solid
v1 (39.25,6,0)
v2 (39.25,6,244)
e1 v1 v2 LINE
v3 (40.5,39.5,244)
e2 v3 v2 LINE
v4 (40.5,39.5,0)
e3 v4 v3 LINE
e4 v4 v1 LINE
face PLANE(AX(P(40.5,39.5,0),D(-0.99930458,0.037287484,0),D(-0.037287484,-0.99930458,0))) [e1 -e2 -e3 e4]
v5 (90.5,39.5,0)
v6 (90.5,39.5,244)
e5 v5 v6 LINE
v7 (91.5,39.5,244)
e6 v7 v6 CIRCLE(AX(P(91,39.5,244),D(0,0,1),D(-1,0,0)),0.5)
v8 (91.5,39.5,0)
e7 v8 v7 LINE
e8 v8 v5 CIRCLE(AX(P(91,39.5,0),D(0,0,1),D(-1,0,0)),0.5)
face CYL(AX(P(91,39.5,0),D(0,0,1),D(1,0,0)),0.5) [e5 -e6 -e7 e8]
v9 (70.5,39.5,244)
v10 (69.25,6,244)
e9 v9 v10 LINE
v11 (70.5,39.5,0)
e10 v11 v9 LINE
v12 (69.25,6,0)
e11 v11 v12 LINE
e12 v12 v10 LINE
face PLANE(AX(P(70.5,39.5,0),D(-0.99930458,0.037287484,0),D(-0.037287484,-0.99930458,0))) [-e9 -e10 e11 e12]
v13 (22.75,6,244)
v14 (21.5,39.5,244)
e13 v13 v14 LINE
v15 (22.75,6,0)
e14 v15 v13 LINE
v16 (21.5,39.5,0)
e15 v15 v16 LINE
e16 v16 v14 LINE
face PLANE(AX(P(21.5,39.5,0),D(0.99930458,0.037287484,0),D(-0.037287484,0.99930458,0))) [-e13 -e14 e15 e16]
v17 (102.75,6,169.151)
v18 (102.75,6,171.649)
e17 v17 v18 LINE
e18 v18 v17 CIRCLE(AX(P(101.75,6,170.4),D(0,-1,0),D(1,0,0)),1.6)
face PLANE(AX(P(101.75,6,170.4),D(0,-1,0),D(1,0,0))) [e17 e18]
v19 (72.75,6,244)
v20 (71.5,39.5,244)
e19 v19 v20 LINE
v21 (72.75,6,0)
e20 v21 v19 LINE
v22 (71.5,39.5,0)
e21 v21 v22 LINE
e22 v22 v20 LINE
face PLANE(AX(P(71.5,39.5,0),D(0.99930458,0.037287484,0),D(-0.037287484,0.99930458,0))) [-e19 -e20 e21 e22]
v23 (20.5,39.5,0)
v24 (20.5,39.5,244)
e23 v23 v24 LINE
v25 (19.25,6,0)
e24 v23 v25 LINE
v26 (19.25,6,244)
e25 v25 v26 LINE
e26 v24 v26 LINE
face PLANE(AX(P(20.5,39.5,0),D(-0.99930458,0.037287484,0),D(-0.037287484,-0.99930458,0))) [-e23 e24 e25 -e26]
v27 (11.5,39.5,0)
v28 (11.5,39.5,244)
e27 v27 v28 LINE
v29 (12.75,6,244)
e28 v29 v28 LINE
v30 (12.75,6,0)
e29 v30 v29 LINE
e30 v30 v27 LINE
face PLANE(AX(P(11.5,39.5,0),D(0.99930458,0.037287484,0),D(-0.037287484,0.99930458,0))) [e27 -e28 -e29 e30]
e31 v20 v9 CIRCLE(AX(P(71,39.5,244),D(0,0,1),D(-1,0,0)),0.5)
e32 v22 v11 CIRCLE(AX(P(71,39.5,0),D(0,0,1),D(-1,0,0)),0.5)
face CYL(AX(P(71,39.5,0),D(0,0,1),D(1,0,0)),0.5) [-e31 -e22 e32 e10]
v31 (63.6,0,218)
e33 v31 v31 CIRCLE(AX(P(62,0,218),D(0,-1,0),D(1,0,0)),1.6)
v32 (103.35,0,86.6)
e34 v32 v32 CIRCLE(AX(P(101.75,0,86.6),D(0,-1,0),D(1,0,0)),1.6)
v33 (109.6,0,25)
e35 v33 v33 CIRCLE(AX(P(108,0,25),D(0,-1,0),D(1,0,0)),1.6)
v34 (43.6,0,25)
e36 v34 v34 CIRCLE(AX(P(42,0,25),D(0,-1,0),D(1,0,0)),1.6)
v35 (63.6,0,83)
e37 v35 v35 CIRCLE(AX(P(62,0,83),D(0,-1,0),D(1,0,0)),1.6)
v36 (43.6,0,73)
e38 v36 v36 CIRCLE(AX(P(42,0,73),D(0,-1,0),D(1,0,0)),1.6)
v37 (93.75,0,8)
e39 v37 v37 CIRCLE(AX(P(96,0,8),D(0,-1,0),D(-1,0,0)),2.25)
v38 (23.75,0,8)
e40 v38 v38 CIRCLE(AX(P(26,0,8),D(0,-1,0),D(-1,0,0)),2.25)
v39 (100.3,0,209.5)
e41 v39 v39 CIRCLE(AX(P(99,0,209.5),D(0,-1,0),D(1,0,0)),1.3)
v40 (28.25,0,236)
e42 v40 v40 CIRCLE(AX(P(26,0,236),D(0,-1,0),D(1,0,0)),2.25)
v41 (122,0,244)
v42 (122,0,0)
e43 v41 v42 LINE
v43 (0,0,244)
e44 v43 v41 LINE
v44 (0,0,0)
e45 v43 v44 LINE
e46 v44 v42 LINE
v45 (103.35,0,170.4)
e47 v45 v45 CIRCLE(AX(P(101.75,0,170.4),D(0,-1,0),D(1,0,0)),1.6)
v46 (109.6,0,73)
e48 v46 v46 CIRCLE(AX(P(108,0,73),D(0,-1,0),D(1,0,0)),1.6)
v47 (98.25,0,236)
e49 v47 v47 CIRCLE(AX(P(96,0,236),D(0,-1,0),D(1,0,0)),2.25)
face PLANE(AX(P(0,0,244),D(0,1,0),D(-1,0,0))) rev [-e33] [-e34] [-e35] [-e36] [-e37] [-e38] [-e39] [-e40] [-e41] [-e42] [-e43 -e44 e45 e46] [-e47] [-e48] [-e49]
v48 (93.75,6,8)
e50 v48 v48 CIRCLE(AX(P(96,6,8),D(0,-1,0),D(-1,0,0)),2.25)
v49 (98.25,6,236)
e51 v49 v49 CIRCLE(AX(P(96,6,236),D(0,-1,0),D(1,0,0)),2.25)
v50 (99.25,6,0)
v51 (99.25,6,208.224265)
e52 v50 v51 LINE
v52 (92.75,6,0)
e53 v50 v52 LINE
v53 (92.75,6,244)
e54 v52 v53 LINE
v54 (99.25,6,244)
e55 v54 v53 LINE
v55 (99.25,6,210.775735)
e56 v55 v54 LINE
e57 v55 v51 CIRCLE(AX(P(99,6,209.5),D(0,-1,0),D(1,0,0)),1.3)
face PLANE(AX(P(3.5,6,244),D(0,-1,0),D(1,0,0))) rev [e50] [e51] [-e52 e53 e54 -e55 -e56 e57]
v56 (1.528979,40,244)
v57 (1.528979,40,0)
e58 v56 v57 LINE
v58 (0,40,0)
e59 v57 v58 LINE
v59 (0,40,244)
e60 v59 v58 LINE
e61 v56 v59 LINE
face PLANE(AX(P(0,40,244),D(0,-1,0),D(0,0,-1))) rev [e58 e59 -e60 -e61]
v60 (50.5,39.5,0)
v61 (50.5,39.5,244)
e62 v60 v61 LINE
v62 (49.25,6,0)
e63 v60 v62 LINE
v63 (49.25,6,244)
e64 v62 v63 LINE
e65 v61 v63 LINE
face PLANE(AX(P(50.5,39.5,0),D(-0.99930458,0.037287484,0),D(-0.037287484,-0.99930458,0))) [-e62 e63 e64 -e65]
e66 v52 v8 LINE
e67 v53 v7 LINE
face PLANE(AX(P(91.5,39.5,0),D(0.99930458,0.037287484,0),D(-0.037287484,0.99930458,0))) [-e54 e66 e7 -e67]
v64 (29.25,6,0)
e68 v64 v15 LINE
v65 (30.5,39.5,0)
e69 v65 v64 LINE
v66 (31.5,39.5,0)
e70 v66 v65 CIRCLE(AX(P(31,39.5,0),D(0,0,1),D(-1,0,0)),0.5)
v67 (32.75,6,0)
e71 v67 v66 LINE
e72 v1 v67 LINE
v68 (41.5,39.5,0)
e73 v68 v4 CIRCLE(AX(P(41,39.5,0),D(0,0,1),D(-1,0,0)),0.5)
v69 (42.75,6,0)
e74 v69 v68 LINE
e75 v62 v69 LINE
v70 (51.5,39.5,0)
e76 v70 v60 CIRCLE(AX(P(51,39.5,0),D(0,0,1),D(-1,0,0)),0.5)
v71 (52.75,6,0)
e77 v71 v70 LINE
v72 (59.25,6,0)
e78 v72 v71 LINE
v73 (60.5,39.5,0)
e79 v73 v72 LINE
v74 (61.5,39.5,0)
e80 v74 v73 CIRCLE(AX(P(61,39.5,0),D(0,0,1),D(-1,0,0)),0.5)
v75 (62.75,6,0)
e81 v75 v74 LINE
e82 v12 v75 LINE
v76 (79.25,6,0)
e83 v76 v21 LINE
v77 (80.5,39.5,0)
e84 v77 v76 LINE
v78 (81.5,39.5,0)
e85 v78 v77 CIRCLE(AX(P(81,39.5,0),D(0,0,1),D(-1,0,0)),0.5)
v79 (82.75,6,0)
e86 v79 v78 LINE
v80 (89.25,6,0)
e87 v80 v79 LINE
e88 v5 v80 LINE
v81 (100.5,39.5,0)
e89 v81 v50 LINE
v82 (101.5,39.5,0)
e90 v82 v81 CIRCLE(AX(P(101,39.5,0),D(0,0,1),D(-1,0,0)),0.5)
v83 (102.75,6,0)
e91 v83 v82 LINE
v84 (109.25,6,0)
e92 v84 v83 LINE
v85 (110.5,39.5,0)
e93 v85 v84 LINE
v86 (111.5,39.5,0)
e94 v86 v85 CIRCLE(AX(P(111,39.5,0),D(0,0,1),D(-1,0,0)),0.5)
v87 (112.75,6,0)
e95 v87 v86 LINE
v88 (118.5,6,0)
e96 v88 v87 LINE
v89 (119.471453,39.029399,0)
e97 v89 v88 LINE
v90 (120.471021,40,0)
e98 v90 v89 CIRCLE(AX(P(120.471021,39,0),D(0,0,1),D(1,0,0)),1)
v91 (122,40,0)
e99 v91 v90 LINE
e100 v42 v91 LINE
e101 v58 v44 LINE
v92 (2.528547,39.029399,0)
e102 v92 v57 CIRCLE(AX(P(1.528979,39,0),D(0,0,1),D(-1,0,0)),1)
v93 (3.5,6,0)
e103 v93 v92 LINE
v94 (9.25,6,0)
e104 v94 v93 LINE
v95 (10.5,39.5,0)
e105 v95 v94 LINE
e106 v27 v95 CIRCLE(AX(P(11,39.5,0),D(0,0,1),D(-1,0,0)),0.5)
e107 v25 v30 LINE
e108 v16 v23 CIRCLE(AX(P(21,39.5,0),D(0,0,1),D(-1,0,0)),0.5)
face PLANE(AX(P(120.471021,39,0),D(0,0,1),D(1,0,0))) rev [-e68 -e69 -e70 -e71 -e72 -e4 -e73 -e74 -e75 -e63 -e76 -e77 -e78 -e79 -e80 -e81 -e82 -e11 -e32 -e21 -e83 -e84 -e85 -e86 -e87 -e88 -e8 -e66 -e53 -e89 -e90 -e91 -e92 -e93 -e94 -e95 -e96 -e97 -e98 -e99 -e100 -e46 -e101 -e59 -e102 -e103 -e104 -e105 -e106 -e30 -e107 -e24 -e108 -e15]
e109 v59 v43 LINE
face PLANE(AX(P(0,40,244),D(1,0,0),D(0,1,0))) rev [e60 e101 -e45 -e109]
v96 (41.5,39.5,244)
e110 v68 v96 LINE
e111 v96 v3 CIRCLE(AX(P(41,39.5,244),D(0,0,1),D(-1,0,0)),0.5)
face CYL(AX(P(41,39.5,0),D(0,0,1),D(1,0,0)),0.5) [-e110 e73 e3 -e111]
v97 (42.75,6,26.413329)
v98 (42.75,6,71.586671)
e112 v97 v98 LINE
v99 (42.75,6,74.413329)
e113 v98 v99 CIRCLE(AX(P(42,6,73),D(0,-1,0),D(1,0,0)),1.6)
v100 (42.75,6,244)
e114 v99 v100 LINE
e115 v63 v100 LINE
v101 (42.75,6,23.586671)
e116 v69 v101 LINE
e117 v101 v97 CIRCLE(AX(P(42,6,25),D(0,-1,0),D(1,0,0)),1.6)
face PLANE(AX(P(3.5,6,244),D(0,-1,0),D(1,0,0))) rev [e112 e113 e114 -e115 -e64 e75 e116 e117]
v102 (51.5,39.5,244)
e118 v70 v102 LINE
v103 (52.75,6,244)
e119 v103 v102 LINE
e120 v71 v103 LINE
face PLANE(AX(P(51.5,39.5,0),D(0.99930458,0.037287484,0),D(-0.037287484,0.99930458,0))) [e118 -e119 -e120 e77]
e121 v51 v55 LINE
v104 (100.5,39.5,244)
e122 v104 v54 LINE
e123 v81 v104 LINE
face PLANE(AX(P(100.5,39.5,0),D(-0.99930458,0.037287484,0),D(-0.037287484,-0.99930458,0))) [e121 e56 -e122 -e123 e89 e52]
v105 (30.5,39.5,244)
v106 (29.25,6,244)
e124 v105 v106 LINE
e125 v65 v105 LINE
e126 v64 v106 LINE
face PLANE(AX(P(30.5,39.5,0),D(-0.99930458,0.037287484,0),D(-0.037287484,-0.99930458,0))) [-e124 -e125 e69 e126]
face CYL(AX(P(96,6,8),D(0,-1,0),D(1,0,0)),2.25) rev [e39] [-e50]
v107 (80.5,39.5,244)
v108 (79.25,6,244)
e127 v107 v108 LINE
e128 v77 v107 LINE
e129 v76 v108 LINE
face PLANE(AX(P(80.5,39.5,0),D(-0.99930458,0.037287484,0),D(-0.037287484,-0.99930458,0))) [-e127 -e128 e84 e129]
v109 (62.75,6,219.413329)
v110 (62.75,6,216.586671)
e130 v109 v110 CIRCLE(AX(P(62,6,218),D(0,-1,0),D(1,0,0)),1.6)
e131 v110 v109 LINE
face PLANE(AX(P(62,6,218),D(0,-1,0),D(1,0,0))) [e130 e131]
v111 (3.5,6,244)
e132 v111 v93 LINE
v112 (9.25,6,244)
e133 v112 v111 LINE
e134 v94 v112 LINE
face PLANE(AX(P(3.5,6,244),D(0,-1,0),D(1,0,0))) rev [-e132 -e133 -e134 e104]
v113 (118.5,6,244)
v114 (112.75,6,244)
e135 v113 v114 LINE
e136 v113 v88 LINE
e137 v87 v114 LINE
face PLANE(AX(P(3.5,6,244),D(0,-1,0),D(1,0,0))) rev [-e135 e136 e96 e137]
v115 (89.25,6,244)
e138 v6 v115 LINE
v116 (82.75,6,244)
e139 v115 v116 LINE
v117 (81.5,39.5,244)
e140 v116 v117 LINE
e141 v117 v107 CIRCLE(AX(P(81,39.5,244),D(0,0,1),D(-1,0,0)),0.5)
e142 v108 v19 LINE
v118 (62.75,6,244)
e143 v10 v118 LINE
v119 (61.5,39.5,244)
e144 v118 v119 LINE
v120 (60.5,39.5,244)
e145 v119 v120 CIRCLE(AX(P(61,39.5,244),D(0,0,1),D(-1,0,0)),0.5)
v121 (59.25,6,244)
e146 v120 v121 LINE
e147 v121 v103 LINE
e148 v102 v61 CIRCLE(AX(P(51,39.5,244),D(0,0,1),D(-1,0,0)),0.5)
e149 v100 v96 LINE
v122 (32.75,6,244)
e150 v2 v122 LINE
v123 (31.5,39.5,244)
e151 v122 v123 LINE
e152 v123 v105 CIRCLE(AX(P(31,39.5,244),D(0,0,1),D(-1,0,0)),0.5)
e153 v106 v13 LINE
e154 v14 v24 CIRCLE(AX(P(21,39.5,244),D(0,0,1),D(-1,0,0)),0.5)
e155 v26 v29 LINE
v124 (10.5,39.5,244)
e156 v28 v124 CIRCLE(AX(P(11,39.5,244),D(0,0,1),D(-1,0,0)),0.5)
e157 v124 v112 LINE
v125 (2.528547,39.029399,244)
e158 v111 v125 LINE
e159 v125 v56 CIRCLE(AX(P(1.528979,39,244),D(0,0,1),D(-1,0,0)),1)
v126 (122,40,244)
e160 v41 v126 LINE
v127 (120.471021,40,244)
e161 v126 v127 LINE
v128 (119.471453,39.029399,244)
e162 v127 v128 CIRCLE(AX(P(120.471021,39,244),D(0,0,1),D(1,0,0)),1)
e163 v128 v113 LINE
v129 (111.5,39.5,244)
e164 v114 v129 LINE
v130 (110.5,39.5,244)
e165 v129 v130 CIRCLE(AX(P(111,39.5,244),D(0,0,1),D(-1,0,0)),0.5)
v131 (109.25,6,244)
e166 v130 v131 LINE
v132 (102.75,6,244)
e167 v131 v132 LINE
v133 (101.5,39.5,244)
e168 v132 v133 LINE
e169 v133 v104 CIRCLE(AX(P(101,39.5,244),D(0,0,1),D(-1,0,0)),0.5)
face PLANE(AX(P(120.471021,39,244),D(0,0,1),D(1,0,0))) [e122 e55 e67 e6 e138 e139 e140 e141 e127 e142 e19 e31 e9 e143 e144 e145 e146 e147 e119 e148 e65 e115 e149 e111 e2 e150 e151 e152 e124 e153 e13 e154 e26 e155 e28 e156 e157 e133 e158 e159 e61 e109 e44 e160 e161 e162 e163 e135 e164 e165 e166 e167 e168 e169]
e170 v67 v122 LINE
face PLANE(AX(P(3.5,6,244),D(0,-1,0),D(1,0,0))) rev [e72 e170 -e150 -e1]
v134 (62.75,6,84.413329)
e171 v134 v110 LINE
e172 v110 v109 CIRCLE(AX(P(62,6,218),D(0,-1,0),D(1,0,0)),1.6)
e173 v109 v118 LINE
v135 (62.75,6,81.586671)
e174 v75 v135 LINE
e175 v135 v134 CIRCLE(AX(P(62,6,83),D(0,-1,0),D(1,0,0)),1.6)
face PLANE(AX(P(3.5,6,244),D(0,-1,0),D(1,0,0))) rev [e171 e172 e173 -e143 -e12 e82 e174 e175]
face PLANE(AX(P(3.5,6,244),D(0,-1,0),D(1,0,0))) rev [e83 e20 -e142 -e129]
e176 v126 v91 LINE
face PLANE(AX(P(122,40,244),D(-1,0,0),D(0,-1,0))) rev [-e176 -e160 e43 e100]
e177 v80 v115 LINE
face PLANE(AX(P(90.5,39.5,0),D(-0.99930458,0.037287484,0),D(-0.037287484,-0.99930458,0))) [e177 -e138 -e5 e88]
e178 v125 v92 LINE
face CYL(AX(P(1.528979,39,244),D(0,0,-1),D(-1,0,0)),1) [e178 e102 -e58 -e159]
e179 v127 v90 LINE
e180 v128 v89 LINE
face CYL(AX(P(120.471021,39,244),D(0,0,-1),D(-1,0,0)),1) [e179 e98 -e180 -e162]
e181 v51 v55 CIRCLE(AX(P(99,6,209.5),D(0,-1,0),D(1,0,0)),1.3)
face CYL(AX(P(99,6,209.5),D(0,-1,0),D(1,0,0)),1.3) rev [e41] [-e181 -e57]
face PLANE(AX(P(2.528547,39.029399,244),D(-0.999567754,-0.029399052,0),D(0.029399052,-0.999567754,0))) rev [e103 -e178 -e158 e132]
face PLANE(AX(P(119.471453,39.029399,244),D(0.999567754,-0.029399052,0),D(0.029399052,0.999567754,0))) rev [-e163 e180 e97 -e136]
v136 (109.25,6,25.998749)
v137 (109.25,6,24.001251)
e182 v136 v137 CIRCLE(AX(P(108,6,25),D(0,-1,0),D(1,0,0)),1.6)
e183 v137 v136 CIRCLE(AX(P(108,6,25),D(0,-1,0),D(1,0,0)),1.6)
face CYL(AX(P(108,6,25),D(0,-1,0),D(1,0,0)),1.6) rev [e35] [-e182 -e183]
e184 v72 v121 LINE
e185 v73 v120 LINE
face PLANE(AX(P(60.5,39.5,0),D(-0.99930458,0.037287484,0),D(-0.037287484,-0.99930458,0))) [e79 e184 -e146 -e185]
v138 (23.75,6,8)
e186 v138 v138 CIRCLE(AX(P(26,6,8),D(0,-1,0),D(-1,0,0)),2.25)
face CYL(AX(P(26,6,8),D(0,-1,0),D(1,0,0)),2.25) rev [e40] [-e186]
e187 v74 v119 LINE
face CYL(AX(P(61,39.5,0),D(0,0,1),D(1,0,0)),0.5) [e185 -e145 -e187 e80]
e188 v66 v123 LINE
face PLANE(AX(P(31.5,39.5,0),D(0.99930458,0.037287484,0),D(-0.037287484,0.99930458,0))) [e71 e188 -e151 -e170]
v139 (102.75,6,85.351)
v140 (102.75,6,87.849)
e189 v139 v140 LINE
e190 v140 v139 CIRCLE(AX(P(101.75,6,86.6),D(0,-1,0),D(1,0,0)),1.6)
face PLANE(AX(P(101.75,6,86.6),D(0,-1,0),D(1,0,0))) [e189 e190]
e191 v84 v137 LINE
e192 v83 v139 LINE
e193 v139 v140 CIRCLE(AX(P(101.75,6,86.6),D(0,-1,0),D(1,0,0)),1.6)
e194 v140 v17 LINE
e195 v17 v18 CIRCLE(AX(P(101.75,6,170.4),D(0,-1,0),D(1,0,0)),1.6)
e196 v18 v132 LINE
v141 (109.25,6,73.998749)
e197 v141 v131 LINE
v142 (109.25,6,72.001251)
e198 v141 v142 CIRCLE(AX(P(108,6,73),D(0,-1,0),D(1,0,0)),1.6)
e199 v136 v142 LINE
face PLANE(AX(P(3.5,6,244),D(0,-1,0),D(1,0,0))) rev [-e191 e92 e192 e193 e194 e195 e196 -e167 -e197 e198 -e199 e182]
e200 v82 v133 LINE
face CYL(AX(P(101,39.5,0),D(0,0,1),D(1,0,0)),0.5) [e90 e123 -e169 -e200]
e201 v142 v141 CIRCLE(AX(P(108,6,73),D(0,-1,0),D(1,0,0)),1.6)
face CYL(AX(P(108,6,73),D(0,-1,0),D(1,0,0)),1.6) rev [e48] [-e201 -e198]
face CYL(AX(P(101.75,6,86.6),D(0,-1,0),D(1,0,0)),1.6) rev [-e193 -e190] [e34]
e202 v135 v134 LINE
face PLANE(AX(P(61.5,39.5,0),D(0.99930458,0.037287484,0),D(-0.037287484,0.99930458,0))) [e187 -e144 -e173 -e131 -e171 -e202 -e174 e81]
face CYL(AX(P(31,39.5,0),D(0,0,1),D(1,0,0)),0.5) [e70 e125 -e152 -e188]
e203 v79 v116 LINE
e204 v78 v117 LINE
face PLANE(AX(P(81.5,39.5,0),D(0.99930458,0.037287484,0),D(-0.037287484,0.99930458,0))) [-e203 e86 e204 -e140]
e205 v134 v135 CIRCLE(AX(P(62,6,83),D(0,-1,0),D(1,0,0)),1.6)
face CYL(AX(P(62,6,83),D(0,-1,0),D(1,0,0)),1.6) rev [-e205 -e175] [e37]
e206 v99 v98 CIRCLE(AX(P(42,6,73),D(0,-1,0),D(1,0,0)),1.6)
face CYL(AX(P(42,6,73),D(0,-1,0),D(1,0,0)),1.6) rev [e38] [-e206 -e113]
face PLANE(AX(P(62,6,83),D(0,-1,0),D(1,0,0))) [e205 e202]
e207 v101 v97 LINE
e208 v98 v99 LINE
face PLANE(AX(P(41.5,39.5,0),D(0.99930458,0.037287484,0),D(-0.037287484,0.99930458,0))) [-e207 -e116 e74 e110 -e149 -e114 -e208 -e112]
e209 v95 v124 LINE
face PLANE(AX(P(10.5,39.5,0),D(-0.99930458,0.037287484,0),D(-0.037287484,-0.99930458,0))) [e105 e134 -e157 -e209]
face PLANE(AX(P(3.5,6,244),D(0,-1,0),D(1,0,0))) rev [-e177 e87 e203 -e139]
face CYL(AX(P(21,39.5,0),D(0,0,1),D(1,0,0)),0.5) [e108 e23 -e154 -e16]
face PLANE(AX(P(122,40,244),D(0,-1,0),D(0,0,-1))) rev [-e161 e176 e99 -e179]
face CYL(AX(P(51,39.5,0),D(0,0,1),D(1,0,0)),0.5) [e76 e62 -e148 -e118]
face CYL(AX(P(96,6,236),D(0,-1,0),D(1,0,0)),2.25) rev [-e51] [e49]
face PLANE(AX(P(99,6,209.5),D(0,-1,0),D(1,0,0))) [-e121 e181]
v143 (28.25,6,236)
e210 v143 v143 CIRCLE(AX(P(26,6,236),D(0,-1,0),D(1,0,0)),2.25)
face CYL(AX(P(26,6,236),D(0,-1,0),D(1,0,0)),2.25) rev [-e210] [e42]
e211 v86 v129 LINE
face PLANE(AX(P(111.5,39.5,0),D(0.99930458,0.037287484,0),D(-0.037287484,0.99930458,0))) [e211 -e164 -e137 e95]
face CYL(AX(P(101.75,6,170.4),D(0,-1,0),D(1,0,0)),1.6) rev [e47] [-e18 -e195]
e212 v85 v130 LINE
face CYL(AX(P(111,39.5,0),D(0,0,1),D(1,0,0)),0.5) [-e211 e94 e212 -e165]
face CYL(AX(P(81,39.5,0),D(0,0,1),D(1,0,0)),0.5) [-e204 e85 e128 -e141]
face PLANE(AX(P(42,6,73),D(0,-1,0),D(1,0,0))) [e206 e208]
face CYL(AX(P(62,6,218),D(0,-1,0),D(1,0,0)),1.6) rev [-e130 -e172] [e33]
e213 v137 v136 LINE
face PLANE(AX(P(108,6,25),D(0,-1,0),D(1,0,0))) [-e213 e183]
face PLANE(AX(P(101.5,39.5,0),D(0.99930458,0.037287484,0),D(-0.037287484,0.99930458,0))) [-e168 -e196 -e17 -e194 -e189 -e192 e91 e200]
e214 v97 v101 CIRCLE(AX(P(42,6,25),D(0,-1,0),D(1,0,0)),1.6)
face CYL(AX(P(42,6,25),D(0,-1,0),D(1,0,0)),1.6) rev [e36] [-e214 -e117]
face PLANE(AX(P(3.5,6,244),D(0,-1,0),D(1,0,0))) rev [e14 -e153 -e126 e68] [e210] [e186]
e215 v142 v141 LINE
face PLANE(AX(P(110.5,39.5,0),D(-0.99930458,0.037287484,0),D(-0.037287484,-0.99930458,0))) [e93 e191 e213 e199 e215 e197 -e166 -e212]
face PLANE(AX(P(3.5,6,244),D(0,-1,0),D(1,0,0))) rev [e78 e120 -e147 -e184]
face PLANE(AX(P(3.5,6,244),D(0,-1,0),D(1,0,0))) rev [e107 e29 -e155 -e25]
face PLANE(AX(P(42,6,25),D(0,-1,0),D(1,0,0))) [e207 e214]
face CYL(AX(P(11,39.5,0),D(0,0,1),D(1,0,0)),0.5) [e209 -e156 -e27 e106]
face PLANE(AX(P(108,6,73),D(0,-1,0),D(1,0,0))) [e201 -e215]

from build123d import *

# Parameters (mm, degrees)
EXTRUDE_1_DEPTH       = 244
EXTRUDE_3_DEPTH       = 244
PATTERN_CURVE_1_COUNT = 11
PATTERN_CURVE_1_PITCH = 10
SKETCH_3_R            = 2.25
CUT_EXTRUDE_1_DEPTH   = 6
SKETCH_4_R            = 1.6
SKETCH_4_R_2          = 1.3
CUT_EXTRUDE_2_DEPTH   = 6


with BuildPart() as part:
    # Эскиз1 → Вытянуть1 (new body)
    with BuildSketch(Plane.XY):
        with BuildLine():
            Line((0, 40), (1.528979332, 40))
            ThreePointArc((1.528979332, 40), (2.225614441, 39.717425624), (2.528547087, 39.029399052))
            Line((2.528547087, 39.029399052), (3.5, 6))
            Line((3.5, 6), (118.5, 6))
            Line((118.5, 6), (119.471452913, 39.029399052))
            ThreePointArc((119.471452913, 39.029399052), (119.774385559, 39.717425624), (120.471020668, 40))
            Line((120.471020668, 40), (122, 40))
            Line((122, 40), (122, 0))
            Line((122, 0), (0, 0))
            Line((0, 0), (0, 40))
        make_face()
    extrude(amount=EXTRUDE_1_DEPTH)

    # Эскиз2 → Вытянуть3 (add)
    with BuildSketch(Plane.XY.offset(244)):
        with BuildLine():
            Line((10.5, 39.5), (9.25, 6))
            Line((9.25, 6), (12.75, 6))
            Line((12.75, 6), (11.5, 39.5))
            ThreePointArc((11.5, 39.5), (11, 40), (10.5, 39.5))
        make_face()
    extrude_3 = extrude(amount=-EXTRUDE_3_DEPTH)

    # Кривая1: Вытянуть3 ×11
    with Locations(*[(i * PATTERN_CURVE_1_PITCH, 0, 0) for i in range(1, PATTERN_CURVE_1_COUNT)]):
        add(extrude_3)

    # Эскиз3 → Вырез-Вытянуть1 (cut)
    with BuildSketch(Plane.XZ):
        with Locations((26, 236)):
            Circle(SKETCH_3_R)
        with Locations((96, 236)):
            Circle(SKETCH_3_R)
        with Locations((96, 8)):
            Circle(SKETCH_3_R)
        with Locations((26, 8)):
            Circle(SKETCH_3_R)
    extrude(amount=-CUT_EXTRUDE_1_DEPTH, mode=Mode.SUBTRACT)

    # Эскиз4 → Вырез-Вытянуть2 (cut)
    with BuildSketch(Plane(origin=(133.240090243, 0, 310.149074448), x_dir=(-1, 0, 0), z_dir=(0, -1, 0))):
        with Locations((71.240090243, 92.149074448)):
            Circle(SKETCH_4_R)
        with Locations((71.240090243, 227.149074448)):
            Circle(SKETCH_4_R)
        with Locations((31.490090243, 223.549074448)):
            Circle(SKETCH_4_R)
        with Locations((31.490090243, 139.749074448)):
            Circle(SKETCH_4_R)
        with Locations((34.240090243, 100.649074448)):
            Circle(SKETCH_4_R_2)
        with Locations((91.240090243, 285.149074448)):
            Circle(SKETCH_4_R)
        with Locations((91.240090243, 237.149074448)):
            Circle(SKETCH_4_R)
        with Locations((25.240090243, 237.149074448)):
            Circle(SKETCH_4_R)
        with Locations((25.240090243, 285.149074448)):
            Circle(SKETCH_4_R)
    extrude(amount=-CUT_EXTRUDE_2_DEPTH, mode=Mode.SUBTRACT)


solid = part.part
